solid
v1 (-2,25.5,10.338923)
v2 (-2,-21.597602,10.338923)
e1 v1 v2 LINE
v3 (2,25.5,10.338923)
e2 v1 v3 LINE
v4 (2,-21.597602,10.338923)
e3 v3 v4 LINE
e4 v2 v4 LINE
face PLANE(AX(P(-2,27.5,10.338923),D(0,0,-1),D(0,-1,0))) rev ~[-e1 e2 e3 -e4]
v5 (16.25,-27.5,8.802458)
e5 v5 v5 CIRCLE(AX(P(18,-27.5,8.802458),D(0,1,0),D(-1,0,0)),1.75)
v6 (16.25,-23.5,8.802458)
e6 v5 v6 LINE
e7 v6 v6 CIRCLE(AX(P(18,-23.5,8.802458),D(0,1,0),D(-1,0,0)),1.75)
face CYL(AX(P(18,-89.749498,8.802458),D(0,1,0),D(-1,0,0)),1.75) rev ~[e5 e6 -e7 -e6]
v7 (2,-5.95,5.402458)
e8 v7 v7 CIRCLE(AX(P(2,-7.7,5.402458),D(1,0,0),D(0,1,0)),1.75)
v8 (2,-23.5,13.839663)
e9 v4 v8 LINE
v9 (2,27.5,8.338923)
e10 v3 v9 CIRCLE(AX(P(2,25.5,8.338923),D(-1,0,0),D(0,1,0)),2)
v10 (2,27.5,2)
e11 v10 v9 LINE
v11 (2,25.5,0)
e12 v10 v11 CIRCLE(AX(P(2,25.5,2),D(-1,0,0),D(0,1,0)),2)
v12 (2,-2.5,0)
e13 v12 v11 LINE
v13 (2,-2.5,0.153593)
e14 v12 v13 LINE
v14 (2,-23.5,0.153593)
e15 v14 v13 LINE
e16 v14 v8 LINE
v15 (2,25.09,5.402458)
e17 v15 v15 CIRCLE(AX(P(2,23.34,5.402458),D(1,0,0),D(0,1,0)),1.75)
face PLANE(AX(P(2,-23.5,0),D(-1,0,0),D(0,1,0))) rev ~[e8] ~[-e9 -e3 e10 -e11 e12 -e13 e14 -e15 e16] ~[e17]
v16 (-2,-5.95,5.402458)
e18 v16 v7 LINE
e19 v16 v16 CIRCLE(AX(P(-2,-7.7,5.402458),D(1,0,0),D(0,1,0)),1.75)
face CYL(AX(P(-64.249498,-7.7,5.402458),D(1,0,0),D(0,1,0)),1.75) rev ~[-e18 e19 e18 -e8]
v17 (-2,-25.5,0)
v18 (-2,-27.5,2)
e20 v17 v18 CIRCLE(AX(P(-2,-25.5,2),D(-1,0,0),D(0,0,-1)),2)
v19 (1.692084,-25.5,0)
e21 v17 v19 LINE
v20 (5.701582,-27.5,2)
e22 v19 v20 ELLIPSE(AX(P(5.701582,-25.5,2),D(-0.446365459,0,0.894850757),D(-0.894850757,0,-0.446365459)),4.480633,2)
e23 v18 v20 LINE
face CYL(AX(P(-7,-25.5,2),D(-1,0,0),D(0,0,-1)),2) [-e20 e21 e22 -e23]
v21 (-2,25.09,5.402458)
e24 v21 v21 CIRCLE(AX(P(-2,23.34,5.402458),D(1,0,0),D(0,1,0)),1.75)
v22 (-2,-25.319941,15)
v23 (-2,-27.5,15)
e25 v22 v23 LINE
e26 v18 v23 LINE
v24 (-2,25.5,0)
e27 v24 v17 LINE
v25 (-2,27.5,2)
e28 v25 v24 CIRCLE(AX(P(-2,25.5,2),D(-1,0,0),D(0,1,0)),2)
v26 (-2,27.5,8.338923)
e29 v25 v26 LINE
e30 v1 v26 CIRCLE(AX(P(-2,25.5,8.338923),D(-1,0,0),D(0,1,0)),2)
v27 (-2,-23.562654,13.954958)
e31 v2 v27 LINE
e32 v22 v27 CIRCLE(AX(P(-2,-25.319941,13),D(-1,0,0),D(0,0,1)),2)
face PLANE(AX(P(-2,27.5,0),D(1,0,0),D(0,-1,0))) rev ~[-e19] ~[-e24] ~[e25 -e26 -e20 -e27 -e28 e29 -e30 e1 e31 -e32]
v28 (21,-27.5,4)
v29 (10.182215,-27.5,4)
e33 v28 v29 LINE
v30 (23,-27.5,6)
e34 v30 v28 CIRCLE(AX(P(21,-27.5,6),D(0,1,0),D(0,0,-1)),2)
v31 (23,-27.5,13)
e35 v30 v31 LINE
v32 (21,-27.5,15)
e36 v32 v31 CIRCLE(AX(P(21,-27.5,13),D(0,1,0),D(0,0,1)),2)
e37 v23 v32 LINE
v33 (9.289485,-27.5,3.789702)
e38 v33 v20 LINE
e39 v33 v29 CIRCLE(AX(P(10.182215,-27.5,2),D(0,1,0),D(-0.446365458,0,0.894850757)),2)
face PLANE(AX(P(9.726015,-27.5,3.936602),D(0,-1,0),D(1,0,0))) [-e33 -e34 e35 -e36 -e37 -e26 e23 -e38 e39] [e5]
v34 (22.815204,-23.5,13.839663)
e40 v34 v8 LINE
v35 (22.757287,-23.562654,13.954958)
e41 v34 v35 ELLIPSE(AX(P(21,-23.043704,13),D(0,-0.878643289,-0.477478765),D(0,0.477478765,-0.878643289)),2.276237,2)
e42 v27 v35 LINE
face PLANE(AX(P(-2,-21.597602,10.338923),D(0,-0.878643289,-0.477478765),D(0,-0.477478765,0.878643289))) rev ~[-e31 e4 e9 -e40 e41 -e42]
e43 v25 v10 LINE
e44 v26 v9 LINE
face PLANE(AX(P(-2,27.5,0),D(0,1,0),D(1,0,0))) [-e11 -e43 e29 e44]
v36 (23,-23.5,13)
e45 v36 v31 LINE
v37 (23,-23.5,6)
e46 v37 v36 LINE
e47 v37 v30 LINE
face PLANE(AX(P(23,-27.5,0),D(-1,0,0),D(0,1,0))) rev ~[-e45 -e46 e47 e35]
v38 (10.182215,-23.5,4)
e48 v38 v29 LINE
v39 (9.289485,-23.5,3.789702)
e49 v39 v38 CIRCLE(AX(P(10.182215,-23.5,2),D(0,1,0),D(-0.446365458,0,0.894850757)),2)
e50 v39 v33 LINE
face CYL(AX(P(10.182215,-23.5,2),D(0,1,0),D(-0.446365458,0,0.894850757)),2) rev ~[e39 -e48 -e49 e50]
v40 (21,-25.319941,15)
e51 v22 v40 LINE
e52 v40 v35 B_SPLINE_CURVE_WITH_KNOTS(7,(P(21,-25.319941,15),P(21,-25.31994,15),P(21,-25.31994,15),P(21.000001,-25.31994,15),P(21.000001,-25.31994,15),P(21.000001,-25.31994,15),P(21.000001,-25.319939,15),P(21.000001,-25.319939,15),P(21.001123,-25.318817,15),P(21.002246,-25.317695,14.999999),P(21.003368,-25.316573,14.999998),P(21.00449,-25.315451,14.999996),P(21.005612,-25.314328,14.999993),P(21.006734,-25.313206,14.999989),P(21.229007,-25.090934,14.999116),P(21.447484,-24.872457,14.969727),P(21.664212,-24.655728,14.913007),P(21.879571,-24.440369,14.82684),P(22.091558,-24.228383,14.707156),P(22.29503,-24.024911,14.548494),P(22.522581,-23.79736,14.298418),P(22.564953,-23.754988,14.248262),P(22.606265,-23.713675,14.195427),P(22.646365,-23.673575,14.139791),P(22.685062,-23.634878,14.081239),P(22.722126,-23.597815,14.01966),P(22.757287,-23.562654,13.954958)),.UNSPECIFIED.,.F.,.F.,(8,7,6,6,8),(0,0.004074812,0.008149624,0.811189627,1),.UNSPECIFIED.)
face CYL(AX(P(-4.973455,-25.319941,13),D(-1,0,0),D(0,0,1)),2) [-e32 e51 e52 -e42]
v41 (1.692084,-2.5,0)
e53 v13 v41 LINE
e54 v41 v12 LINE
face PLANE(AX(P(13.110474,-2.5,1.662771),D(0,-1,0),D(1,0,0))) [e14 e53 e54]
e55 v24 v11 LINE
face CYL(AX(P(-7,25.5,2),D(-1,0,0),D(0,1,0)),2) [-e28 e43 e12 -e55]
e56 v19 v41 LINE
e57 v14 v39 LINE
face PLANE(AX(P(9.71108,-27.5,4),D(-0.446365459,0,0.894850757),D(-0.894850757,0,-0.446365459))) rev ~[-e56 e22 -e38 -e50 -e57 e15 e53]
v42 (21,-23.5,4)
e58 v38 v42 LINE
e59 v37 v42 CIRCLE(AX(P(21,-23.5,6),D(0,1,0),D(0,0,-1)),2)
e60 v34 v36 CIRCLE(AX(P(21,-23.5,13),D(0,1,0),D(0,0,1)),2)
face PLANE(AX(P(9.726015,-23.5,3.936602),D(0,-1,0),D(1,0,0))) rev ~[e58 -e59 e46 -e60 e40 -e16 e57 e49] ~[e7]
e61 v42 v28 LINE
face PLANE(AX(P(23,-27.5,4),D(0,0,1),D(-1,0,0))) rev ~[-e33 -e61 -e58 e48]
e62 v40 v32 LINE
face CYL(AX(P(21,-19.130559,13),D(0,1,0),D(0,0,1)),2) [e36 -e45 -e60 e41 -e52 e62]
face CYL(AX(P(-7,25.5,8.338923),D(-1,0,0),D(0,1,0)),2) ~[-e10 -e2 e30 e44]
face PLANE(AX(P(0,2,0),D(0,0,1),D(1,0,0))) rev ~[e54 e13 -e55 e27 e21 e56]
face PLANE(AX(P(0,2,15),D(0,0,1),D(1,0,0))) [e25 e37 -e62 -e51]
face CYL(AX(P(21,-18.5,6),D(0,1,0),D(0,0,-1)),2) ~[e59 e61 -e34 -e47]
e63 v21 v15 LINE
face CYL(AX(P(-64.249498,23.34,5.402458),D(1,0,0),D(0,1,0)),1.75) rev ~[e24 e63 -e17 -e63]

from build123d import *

# Parameters (mm, degrees)
F0_W         = 4
F0_H         = 51
F0_H_2       = 4
F0_W_2       = 21
F1_DEPTH     = 15
F4_D         = 3.5
F4_ON_F3_D   = 3.5
F5_DEPTH     = 25
F6_DEPTH     = 25
F7_T1_DEPTH  = 4
F7_T3_DEPTH  = 14
F7_T5_DEPTH  = 13.3694414049
F7_T7_DEPTH  = 14
F7_T9_DEPTH  = 30.9469097591
F7_T11_DEPTH = 13.6920837807


# Not quite as in the source:
# - a fillet or chamfer that OpenCascade refuses, or shapes differently, is made with other operations: its cross-section is extruded or revolved along the edge and cut away or added


with BuildPart() as f1:
    # F0 (on Top) → F1 (new body)
    with BuildSketch(Plane.XY):
        with Locations((0, 2)):
            Rectangle(F0_W, F0_H)
        with Locations((0, -25.5)):
            Rectangle(F0_W, F0_H_2)
        with Locations((12.5, -25.5)):
            Rectangle(F0_W_2, F0_H_2)
    extrude(amount=F1_DEPTH)

    # F4 (through all)
    with Locations(Plane(origin=(-2, 0, 0), x_dir=(0, -1, 0), z_dir=(-1, 0, 0))):
        with Locations((-23.34, 5.4024579003), (7.7, 5.4024579003)):
            Hole(F4_D / 2)

    # F4 on F3 (through all)
    with Locations(Plane.XZ.offset(27.5)):
        with Locations((18, 8.8024579003)):
            Hole(F4_ON_F3_D / 2)

    # F2 (on face) → F5 (cut)
    with BuildSketch(Plane(origin=(-2, 0, 0), x_dir=(0, -1, 0), z_dir=(-1, 0, 0))):
        Polygon((-27.5, 15), (-27.5, 10.3389231786), (21.5976021229, 10.3389231786), (24.1305585951, 15), align=None)
    extrude(amount=-F5_DEPTH, mode=Mode.SUBTRACT)

    # F3 (on face) → F6 (cut)
    with BuildSketch(Plane.XZ.offset(27.5)):
        Polygon((23, 0), (23, 4), (9.7110802308, 4), (1.6920837807, 0), align=None)
    extrude(amount=-F6_DEPTH, mode=Mode.SUBTRACT)

    # F7: fillet of radius 2 on 7 edges, made by hand

    # F7_s2 → F7_t1 (join)
    with BuildSketch(Plane.XZ.offset(23.5)):
        with BuildLine():
            ThreePointArc((9.2894845277, 3.7897015141), (9.7236323162, 3.9467155709), (10.1822154449, 4))
            Line((10.1822154449, 4), (9.7110802308, 4))
            Line((9.7110802308, 4), (9.2894845277, 3.7897015141))
        make_face()
    extrude(amount=F7_T1_DEPTH)

    # F7_s4 → F7_t3 (cut)
    with BuildSketch(Plane.YZ.offset(-7)):
        with BuildLine():
            ThreePointArc((27.5, 8.3389231786), (26.9142135624, 9.753136741), (25.5, 10.3389231786))
            Line((25.5, 10.3389231786), (27.5, 10.3389231786))
            Line((27.5, 10.3389231786), (27.5, 8.3389231786))
        make_face()
        with BuildLine():
            ThreePointArc((27.5, 2), (26.9142135624, 0.5857864376), (25.5, 0))
            Line((25.5, 0), (27.5, 0))
            Line((27.5, 0), (27.5, 2))
        make_face()
    extrude(amount=F7_T3_DEPTH, mode=Mode.SUBTRACT)

    # F7_s6 → F7_t5 (cut)
    with BuildSketch(Plane.XZ.offset(19.1305585951)):
        with BuildLine():
            ThreePointArc((21, 15), (22.4142135624, 14.4142135624), (23, 13))
            Line((23, 13), (23, 15))
            Line((23, 15), (21, 15))
        make_face()
    extrude(amount=F7_T5_DEPTH, mode=Mode.SUBTRACT)

    # F7_s8 → F7_t7 (cut)
    with BuildSketch(Plane.XZ.offset(18.5)):
        with BuildLine():
            ThreePointArc((21, 4), (22.4142135624, 4.5857864376), (23, 6))
            Line((23, 6), (23, 4))
            Line((23, 4), (21, 4))
        make_face()
    extrude(amount=F7_T7_DEPTH, mode=Mode.SUBTRACT)

    # F7_s10 → F7_t9 (cut)
    with BuildSketch(Plane.YZ.offset(-4.9734548795)):
        with BuildLine():
            ThreePointArc((-25.3199405469, 15), (-24.2976673595, 14.7189989908), (-23.5626539694, 13.9549575303))
            Line((-23.5626539694, 13.9549575303), (-24.1305585951, 15))
            Line((-24.1305585951, 15), (-25.3199405469, 15))
        make_face()
    extrude(amount=F7_T9_DEPTH, mode=Mode.SUBTRACT)

    # F7_s12 → F7_t11 (cut)
    with BuildSketch(Plane.YZ.offset(-7)):
        with BuildLine():
            ThreePointArc((-25.5, 0), (-26.9142135624, 0.5857864376), (-27.5, 2))
            Line((-27.5, 2), (-27.5, 0))
            Line((-27.5, 0), (-25.5, 0))
        make_face()
    extrude(amount=F7_T11_DEPTH, mode=Mode.SUBTRACT)


solid = f1.part
